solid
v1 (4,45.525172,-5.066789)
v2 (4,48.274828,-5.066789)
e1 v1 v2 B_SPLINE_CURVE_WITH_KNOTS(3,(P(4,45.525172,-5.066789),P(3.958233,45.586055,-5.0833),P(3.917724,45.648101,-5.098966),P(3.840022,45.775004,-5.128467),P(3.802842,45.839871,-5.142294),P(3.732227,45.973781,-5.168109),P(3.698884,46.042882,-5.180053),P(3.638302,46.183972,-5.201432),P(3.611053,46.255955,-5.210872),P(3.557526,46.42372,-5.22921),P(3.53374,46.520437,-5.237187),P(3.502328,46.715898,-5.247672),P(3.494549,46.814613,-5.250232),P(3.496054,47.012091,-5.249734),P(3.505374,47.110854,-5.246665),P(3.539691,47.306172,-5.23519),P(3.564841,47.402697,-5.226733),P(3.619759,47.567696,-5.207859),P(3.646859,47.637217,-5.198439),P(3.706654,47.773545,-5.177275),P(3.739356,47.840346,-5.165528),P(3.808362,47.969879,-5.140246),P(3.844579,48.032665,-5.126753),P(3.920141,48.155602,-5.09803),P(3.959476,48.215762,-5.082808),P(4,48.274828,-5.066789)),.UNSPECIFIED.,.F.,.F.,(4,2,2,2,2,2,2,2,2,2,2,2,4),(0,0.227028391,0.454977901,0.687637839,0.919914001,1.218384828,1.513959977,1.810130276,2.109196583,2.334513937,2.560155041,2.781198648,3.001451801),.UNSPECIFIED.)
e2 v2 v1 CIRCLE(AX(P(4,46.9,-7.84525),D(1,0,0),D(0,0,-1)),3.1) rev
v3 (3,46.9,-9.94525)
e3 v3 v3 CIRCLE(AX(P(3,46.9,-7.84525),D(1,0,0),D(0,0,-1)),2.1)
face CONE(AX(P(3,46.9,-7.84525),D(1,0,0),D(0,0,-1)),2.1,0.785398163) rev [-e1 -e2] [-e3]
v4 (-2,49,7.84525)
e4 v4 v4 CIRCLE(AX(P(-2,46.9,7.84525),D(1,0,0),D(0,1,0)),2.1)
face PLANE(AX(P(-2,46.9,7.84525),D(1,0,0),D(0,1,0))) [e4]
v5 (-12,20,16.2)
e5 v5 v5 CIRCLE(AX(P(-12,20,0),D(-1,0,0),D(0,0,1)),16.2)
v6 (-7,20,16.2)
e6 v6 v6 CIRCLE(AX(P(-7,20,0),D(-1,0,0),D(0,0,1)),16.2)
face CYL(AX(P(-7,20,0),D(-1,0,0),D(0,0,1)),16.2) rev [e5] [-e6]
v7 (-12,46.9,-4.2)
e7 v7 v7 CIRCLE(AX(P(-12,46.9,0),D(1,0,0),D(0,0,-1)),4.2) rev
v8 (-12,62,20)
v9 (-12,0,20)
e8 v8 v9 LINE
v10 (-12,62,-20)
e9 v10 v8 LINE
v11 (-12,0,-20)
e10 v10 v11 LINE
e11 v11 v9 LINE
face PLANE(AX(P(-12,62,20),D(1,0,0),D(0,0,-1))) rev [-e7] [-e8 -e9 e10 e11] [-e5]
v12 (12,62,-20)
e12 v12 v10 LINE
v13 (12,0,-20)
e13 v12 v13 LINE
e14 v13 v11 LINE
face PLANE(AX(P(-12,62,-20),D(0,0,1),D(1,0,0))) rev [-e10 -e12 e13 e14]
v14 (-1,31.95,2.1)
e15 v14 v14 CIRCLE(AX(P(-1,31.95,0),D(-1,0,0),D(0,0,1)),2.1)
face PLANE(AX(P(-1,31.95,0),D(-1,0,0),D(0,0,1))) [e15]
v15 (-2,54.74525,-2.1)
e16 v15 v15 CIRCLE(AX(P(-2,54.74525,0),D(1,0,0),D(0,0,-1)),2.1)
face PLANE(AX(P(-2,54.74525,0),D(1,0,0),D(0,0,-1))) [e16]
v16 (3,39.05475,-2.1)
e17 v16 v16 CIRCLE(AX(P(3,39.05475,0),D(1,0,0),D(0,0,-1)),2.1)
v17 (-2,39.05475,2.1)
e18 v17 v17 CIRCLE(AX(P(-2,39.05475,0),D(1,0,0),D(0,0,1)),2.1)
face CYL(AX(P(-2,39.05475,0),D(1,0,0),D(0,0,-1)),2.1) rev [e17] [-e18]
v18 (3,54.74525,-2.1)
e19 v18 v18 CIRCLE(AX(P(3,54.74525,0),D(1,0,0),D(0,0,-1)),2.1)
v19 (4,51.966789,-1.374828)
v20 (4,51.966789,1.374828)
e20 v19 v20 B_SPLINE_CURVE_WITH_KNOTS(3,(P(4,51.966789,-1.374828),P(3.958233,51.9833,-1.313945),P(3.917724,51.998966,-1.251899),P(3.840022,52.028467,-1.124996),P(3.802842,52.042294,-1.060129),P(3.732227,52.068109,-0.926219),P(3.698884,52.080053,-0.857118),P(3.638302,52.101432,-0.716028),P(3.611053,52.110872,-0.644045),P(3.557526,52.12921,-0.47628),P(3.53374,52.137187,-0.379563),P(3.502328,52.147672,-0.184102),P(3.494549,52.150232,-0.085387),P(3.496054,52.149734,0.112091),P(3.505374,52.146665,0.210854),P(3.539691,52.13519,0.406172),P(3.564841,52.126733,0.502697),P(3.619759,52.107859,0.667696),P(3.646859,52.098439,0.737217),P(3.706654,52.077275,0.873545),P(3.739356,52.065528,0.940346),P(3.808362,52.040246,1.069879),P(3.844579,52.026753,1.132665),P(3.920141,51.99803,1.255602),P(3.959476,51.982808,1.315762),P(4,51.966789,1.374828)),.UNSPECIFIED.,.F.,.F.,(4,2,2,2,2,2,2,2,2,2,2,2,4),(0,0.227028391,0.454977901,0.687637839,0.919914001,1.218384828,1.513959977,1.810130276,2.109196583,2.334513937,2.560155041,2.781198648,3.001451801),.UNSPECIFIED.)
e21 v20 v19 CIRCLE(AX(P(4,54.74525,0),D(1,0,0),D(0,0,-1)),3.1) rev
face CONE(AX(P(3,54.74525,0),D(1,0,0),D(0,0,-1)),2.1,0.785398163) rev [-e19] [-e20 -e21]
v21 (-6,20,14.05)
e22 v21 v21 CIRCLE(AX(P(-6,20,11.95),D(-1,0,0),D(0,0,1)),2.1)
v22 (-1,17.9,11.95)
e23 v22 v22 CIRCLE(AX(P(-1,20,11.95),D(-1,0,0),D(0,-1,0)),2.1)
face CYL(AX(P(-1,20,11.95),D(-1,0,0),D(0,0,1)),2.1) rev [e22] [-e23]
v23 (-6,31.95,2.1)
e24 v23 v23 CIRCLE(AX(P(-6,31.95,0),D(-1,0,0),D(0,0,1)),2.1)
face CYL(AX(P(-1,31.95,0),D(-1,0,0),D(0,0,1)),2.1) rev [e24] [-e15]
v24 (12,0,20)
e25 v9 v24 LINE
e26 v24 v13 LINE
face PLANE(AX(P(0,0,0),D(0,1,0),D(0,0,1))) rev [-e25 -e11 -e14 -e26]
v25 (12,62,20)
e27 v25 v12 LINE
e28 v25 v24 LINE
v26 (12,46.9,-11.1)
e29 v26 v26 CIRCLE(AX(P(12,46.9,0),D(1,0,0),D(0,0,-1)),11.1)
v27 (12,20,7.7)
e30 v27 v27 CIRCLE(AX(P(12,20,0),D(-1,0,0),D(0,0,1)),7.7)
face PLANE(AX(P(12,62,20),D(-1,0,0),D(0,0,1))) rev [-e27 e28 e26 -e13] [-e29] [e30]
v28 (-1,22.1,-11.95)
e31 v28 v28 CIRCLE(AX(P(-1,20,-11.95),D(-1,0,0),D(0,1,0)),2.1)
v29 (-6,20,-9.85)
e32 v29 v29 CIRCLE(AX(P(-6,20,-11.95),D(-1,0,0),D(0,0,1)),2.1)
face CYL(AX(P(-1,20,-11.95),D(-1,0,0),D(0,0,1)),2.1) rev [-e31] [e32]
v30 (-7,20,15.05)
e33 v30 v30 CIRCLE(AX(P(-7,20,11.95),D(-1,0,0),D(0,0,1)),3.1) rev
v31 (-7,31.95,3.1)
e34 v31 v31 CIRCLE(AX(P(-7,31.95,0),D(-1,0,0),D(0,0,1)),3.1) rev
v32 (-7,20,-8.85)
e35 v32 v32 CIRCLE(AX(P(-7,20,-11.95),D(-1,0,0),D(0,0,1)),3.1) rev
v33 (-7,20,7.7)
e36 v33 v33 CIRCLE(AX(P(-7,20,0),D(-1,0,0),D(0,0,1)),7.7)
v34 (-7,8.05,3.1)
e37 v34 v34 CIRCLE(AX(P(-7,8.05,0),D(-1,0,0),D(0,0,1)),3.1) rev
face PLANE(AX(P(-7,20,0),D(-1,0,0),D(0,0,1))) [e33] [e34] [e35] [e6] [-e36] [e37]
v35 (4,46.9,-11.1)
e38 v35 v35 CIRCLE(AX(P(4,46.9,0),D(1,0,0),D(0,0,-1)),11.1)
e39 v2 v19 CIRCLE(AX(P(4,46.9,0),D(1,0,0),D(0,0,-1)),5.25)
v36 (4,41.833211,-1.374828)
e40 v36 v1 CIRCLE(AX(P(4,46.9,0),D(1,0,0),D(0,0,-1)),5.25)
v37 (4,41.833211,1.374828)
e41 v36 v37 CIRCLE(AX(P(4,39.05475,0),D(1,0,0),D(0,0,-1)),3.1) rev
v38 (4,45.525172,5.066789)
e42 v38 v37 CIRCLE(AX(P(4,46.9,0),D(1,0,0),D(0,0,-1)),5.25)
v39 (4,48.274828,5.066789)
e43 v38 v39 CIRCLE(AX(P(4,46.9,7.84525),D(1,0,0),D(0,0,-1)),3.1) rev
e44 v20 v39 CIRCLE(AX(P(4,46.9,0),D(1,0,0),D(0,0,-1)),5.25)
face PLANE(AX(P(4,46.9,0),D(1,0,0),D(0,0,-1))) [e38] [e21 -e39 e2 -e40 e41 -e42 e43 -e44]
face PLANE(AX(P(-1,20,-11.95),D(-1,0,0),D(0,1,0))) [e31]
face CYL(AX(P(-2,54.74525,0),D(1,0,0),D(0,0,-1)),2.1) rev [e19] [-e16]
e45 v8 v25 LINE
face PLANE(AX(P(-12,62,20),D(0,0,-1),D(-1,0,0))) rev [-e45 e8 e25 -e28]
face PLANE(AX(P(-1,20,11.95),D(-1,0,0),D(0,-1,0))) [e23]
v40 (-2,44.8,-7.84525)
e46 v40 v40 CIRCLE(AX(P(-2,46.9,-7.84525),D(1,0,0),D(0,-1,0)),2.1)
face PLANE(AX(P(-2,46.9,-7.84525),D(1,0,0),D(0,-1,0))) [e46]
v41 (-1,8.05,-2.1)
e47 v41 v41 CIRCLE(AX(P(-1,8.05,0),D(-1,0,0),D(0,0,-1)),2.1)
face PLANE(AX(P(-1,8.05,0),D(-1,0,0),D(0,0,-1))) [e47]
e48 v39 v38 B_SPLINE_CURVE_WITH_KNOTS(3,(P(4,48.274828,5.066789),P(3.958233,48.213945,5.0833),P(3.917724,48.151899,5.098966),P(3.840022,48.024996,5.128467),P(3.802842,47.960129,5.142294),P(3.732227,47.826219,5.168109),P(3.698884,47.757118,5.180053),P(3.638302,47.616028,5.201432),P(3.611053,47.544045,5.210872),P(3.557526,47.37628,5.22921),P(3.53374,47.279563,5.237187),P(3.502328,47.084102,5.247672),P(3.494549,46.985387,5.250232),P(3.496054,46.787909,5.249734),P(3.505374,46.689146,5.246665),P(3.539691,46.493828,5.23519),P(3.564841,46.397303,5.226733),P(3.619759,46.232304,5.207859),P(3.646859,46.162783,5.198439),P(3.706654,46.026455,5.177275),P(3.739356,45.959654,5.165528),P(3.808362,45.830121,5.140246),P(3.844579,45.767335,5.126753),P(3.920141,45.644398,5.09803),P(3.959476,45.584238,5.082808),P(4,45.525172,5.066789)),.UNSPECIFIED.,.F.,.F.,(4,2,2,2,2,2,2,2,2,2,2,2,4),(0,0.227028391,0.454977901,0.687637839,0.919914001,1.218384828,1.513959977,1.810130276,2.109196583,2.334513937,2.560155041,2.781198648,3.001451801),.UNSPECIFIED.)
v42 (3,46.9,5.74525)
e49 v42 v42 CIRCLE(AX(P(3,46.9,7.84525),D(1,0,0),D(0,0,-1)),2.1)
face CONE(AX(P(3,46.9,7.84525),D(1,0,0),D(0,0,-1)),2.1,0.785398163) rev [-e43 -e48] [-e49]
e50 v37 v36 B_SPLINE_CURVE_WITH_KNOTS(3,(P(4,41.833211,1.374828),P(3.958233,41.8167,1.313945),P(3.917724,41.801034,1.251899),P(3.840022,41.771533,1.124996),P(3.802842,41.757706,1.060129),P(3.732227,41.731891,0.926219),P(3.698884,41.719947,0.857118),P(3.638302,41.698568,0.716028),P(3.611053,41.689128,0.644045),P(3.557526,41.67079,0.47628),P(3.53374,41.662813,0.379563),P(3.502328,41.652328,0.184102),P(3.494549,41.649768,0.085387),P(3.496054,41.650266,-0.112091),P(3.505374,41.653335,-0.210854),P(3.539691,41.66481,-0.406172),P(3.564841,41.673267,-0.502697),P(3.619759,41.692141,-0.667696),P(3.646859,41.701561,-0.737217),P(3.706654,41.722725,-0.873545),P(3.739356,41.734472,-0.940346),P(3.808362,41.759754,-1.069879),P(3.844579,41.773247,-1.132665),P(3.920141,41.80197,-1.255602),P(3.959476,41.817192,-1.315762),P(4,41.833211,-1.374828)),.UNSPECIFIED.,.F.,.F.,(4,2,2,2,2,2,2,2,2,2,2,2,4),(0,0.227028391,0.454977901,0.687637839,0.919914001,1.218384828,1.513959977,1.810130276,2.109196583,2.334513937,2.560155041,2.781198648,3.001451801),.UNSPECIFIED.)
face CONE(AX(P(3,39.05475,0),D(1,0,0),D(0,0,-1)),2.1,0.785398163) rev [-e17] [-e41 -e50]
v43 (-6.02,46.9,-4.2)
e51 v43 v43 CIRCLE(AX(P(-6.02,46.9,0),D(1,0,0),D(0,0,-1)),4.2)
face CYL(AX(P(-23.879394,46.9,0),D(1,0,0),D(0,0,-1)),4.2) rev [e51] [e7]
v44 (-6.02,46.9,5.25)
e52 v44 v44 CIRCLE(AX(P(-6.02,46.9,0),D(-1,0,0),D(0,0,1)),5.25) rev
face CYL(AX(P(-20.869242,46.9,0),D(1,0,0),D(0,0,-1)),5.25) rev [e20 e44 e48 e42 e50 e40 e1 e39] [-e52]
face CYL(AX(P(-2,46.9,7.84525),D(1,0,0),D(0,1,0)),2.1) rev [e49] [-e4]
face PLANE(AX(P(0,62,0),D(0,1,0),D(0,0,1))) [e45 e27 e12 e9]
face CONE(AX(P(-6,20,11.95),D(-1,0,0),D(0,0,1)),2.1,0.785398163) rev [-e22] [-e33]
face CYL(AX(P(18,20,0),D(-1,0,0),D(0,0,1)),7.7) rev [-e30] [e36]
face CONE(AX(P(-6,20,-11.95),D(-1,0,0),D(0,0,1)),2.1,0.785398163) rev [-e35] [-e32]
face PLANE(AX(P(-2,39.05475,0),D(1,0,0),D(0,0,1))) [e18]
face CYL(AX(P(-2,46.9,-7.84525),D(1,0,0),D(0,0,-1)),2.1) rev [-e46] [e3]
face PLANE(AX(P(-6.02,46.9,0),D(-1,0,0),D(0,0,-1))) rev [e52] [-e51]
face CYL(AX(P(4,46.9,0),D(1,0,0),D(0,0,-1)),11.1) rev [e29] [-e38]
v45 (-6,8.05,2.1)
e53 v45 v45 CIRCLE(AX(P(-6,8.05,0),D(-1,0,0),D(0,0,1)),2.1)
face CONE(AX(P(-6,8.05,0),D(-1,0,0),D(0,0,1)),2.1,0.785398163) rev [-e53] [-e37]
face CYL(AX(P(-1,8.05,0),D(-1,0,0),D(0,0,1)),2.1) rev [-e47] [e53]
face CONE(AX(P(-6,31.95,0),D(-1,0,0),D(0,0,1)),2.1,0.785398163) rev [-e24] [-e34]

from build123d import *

# Parameters (mm, degrees)
SKETCH1_W                    = 24
SKETCH1_H                    = 40
BOSS_EXTRUDE1_DEPTH          = 62
SKETCH2_R                    = 16.2
CUT_EXTRUDE1_DEPTH           = 5
SKETCH3_R                    = 7.7
CUT_EXTRUDE2_DEPTH           = 25
SKETCH4_R                    = 2.1
CUT_EXTRUDE3_DEPTH           = 6
CHAMFER1_SIZE                = 1
CIRPATTERN1_COUNT            = 4
CHAMFER1_OF_CIRPATTERN1_SIZE = 1
SKETCH5_R                    = 11.1
CUT_EXTRUDE4_DEPTH           = 8
CUT_EXTRUDE5_START           = -10.02
SKETCH6_R                    = 5.25
CUT_EXTRUDE5_DEPTH           = 10.02
SKETCH7_R                    = 4.2
CUT_EXTRUDE6_DEPTH           = 5.98
SKETCH8_R                    = 2.1
CUT_EXTRUDE7_DEPTH           = 6
CHAMFER2_SIZE                = 1
CIRPATTERN2_COUNT            = 4
CHAMFER2_OF_CIRPATTERN2_SIZE = 1


with BuildPart() as part:
    # Sketch1 → Boss-Extrude1 (new body)
    with BuildSketch(Plane(origin=(0, 0, 0), x_dir=(1, 0, 0), z_dir=(0, 1, 0))):
        Rectangle(SKETCH1_W, SKETCH1_H)
    extrude(amount=BOSS_EXTRUDE1_DEPTH)

    # Sketch2 → Cut-Extrude1 (cut)
    with BuildSketch(Plane.ZY.offset(12)):
        with Locations((0, 20)):
            Circle(SKETCH2_R)
    extrude(amount=-CUT_EXTRUDE1_DEPTH, mode=Mode.SUBTRACT)

    # Sketch3 → Cut-Extrude2 (cut)
    with BuildSketch(Plane.ZY.offset(7)):
        with Locations((0, 20)):
            Circle(SKETCH3_R)
    extrude(amount=-CUT_EXTRUDE2_DEPTH, mode=Mode.SUBTRACT)

    # Sketch4 → Cut-Extrude3 (cut)
    with BuildSketch(Plane.ZY.offset(7)):
        with Locations((0, 31.95)):
            Circle(SKETCH4_R)
    cut_extrude3 = extrude(amount=-CUT_EXTRUDE3_DEPTH, mode=Mode.SUBTRACT)

    # Chamfer1
    chamfer1_edges = [part.edges().sort_by_distance(p)[0] for p in [
        (-7, 31.95, -2.1),
    ]]
    chamfer(chamfer1_edges, length=CHAMFER1_SIZE)

    # CirPattern1: Cut-Extrude3 ×4 about axis
    cirpattern1_axis = Axis((0, 20, 0), (1, 0, 0))
    for i in range(1, CIRPATTERN1_COUNT):
        add(cut_extrude3.rotate(cirpattern1_axis, i * 360 / CIRPATTERN1_COUNT), mode=Mode.SUBTRACT)

    # Chamfer1 of CirPattern1
    chamfer1_of_cirpattern1_edges = [part.edges().sort_by_distance(p)[0] for p in [
        (-7, 22.1, 11.95),
        (-7, 8.05, 2.1),
        (-7, 17.9, -11.95),
    ]]
    chamfer(chamfer1_of_cirpattern1_edges, length=CHAMFER1_OF_CIRPATTERN1_SIZE)

    # Sketch5 → Cut-Extrude4 (cut)
    with BuildSketch(Plane(origin=(12, 0, 0), x_dir=(0, 0, -1), z_dir=(1, 0, 0))):
        with Locations((0, 46.9)):
            Circle(SKETCH5_R)
    extrude(amount=-CUT_EXTRUDE4_DEPTH, mode=Mode.SUBTRACT)

    # Sketch6 → Cut-Extrude5 (cut)
    with BuildSketch(Plane(origin=(4, 0, 0), x_dir=(0, 0, -1), z_dir=(1, 0, 0)).offset(CUT_EXTRUDE5_START)):
        with Locations((0, 46.9)):
            Circle(SKETCH6_R)
    extrude(amount=CUT_EXTRUDE5_DEPTH, mode=Mode.SUBTRACT)

    # Sketch7 → Cut-Extrude6 (cut)
    with BuildSketch(Plane(origin=(-6.02, 0, 0), x_dir=(0, 0, -1), z_dir=(1, 0, 0))):
        with Locations((0, 46.9)):
            Circle(SKETCH7_R)
    extrude(amount=-CUT_EXTRUDE6_DEPTH, mode=Mode.SUBTRACT)

    # Sketch8 → Cut-Extrude7 (cut)
    with BuildSketch(Plane(origin=(4, 0, 0), x_dir=(0, 0, -1), z_dir=(1, 0, 0))):
        with Locations((0, 54.74525)):
            Circle(SKETCH8_R)
    cut_extrude7 = extrude(amount=-CUT_EXTRUDE7_DEPTH, mode=Mode.SUBTRACT)

    # Chamfer2
    # the kernel refuses this chamfer: 1 mm, written as the material it takes off along each edge
    with BuildSketch(Plane(origin=(4, 54.74525, 0), x_dir=(0, 0, -1), z_dir=(0, -1, 0))) as chamfer2_piece_1:
        Polygon((2.1 + CHAMFER2_SIZE, 0), (2.1, -CHAMFER2_SIZE), (2.1, 0), align=None)
    revolve(axis=Axis((4, 54.74525, 0), (1, 0, 0)), mode=Mode.SUBTRACT)

    # CirPattern2: Cut-Extrude7 ×4 about axis
    cirpattern2_axis = Axis((0, 46.9, 0), (1, 0, 0))
    for i in range(1, CIRPATTERN2_COUNT):
        add(cut_extrude7.rotate(cirpattern2_axis, i * 360 / CIRPATTERN2_COUNT), mode=Mode.SUBTRACT)

    # Chamfer2 of CirPattern2
    # the kernel refuses this chamfer: 1 mm, written as the material it takes off along each edge
    with BuildSketch(Plane(origin=(4, 46.9, 7.84525), x_dir=(0, 1, 0), z_dir=(0, 0, -1))) as chamfer2_of_cirpattern2_piece_1:
        Polygon((2.1 + CHAMFER2_OF_CIRPATTERN2_SIZE, 0), (2.1, -CHAMFER2_OF_CIRPATTERN2_SIZE), (2.1, 0), align=None)
    revolve(axis=Axis((4, 46.9, 7.84525), (1, 0, 0)), mode=Mode.SUBTRACT)
    with BuildSketch(Plane(origin=(4, 39.05475, 0), x_dir=(0, 0, 1), z_dir=(0, 1, 0))) as chamfer2_of_cirpattern2_piece_2:
        Polygon((2.1 + CHAMFER2_OF_CIRPATTERN2_SIZE, 0), (2.1, -CHAMFER2_OF_CIRPATTERN2_SIZE), (2.1, 0), align=None)
    revolve(axis=Axis((4, 39.05475, 0), (1, 0, 0)), mode=Mode.SUBTRACT)
    with BuildSketch(Plane(origin=(4, 46.9, -7.84525), x_dir=(0, -1, 0), z_dir=(0, 0, 1))) as chamfer2_of_cirpattern2_piece_3:
        Polygon((2.1 + CHAMFER2_OF_CIRPATTERN2_SIZE, 0), (2.1, -CHAMFER2_OF_CIRPATTERN2_SIZE), (2.1, 0), align=None)
    revolve(axis=Axis((4, 46.9, -7.84525), (1, 0, 0)), mode=Mode.SUBTRACT)


solid = part.part
